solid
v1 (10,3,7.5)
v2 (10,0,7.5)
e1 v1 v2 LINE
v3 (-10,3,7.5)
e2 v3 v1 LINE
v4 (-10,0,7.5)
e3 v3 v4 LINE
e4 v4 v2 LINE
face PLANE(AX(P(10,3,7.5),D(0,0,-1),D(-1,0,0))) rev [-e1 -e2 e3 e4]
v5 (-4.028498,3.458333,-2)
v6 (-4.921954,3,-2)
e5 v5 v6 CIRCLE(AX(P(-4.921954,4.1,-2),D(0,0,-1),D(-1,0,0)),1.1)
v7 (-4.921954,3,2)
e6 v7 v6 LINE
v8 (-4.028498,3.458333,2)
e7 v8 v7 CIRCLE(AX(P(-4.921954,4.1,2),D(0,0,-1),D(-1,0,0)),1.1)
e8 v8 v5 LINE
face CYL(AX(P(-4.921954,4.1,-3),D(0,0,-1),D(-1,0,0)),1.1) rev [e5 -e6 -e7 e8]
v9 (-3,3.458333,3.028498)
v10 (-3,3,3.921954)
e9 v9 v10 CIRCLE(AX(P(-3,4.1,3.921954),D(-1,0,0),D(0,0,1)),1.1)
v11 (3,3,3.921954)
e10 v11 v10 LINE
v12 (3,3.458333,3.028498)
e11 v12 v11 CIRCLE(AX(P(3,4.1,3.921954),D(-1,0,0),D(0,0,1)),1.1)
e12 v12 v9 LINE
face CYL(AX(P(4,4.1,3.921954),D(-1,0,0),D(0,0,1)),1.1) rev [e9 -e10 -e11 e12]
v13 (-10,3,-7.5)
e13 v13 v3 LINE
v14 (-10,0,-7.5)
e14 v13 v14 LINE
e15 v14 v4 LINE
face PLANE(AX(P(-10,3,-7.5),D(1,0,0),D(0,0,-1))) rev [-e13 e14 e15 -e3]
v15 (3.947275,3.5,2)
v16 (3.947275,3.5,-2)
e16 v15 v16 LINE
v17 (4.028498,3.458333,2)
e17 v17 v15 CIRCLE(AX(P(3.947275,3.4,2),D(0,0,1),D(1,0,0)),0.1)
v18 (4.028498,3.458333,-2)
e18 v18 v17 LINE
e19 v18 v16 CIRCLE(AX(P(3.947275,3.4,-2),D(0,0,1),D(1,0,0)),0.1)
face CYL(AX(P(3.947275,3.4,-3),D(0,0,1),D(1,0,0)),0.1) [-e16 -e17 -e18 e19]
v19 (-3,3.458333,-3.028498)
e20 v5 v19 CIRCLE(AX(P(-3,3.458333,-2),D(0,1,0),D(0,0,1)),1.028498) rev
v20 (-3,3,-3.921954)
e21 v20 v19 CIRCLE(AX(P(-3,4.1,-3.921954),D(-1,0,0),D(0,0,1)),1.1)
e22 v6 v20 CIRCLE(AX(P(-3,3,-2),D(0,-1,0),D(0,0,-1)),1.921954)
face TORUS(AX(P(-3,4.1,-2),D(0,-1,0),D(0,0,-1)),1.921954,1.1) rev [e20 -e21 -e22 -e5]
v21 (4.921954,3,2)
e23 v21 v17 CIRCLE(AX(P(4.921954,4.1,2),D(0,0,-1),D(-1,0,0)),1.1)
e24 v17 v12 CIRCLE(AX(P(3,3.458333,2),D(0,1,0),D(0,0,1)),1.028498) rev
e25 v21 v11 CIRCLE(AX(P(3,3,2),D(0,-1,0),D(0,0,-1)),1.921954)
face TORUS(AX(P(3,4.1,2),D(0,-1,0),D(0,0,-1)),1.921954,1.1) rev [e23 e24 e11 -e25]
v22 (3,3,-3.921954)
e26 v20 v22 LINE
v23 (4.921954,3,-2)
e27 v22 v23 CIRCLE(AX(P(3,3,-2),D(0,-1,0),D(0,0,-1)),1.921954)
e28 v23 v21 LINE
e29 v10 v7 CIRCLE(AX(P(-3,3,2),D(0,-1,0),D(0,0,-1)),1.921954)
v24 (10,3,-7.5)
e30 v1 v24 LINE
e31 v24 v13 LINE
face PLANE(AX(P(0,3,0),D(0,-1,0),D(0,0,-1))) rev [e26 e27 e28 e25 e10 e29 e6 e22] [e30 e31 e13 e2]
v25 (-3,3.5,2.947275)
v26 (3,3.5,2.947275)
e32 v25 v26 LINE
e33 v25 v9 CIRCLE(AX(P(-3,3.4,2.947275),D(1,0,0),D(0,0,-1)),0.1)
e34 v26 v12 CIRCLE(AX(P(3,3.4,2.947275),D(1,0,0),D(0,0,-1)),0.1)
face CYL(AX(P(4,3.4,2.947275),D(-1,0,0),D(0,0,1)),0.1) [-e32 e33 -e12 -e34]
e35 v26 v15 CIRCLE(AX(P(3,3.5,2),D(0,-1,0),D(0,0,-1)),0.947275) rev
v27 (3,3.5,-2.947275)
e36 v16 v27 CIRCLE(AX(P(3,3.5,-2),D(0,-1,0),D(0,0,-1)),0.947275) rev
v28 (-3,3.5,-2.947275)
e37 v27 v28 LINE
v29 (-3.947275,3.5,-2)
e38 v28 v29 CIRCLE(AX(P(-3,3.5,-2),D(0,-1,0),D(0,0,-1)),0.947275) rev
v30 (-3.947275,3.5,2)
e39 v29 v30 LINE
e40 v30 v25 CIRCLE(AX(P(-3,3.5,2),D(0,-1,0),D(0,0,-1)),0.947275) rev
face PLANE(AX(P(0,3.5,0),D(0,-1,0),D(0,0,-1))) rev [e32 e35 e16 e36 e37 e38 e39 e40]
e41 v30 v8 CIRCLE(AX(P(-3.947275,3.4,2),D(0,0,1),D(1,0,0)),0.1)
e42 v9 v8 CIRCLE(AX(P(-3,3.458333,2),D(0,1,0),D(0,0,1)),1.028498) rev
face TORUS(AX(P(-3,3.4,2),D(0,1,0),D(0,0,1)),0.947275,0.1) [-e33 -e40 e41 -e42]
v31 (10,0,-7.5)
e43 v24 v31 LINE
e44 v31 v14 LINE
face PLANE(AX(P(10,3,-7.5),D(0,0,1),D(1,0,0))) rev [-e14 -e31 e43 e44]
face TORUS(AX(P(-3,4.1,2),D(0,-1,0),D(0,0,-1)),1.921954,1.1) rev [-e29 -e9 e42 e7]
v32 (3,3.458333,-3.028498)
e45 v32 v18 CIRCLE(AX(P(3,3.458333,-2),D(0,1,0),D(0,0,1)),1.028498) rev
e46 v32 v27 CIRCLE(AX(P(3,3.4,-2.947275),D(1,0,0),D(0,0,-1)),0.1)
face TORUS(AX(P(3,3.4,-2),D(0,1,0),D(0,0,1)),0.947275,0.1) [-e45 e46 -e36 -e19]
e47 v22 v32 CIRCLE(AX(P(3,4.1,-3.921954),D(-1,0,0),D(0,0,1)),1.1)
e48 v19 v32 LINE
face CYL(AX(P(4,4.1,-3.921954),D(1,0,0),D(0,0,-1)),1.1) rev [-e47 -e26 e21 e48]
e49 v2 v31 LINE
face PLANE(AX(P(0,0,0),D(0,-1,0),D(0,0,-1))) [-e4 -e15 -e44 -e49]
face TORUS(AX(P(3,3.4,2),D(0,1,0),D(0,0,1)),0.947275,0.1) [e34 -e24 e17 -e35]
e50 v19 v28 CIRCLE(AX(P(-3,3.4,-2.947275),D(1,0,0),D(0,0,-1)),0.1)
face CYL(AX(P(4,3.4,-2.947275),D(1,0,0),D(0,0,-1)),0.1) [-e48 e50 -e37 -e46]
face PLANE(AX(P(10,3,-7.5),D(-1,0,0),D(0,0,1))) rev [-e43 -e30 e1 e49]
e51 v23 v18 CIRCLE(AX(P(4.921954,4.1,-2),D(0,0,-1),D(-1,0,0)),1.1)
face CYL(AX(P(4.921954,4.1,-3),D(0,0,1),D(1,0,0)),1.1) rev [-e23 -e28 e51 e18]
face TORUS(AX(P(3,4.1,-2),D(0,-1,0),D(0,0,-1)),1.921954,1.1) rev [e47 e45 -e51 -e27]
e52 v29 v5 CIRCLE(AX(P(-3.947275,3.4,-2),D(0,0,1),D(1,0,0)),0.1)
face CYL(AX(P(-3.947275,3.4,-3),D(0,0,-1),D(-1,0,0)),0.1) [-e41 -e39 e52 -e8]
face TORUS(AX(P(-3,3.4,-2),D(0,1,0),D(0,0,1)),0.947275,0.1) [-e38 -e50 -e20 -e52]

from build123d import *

# Parameters (mm, degrees)
SKETCH_1_W      = 20
SKETCH_1_H      = 15
EXTRUDE_1_DEPTH = 3
SKETCH_2_W      = 8
SKETCH_2_H      = 6
EXTRUDE_2_DEPTH = 0.5
FILLET_1_R      = 1
FILLET_2_R      = 1.1
FILLET_3_R      = 0.1


with BuildPart() as part:
    # 草图1 → 凸台-拉伸1 (new body)
    with BuildSketch(Plane(origin=(0, 0, 0), x_dir=(1, 0, 0), z_dir=(0, 1, 0))):
        Rectangle(SKETCH_1_W, SKETCH_1_H)
    extrude(amount=EXTRUDE_1_DEPTH)

    # 草图2 → 凸台-拉伸2 (add)
    with BuildSketch(Plane(origin=(0, 3, 0), x_dir=(1, 0, 0), z_dir=(0, 1, 0))):
        Rectangle(SKETCH_2_W, SKETCH_2_H)
    extrude(amount=EXTRUDE_2_DEPTH)

    # 圆角1
    fillet_1_edges = [part.edges().sort_by_distance(p)[0] for p in [
        (-4, 3.25, -3),
        (-4, 3.25, 3),
        (4, 3.25, 3),
        (4, 3.25, -3),
    ]]
    fillet(fillet_1_edges, radius=FILLET_1_R)

    # 圆角2
    # the kernel refuses this fillet: 1.1 mm, written as the material it adds along each edge
    with BuildSketch(Plane(origin=(3, 3, 2), x_dir=(0, 0, 1), z_dir=(-1, 0, 0))) as fillet_2_piece_1:
        with BuildLine():
            CenterArc((1.921954446, 1.1), FILLET_2_R, 213.055731151, 56.944268849)
            Line((1, 0.5), (0.981560911, 0.488))
            ThreePointArc((0.981560911, 0.488), (0.978, 0.25), (0.978, 0))
            Line((0.978, 0), (1, -0.022))
            Line((1, -0.022), (1.921954446, -0.022))
            Line((1.921954446, -0.022), (1.921954446, 0))
        make_face()
    revolve(axis=Axis((3, 3, 2), (0, 1, 0)), revolution_arc=90)
    with BuildSketch(Plane(origin=(-3, 3, 3), x_dir=(0, 0, 1), z_dir=(1, 0, 0)), Plane(origin=(3, 3, -3), x_dir=(0, 0, -1), z_dir=(-1, 0, 0))) as fillet_2_piece_2:
        with BuildLine():
            CenterArc((0.921954446, -1.1), FILLET_2_R, 90, 56.944268849)
            Line((0, -0.5), (-0.018439089, -0.488))
            ThreePointArc((-0.018439089, -0.488), (-0.022, -0.25), (-0.022, 0))
            Line((-0.022, 0), (0, 0.022))
            Line((0, 0.022), (0.921954446, 0.022))
            Line((0.921954446, 0.022), (0.921954446, 0))
        make_face()
    extrude(amount=6)
    with BuildSketch(Plane(origin=(-3, 3, 2), x_dir=(-1, 0, 0), z_dir=(0, 0, -1))) as fillet_2_piece_3:
        with BuildLine():
            CenterArc((1.921954446, 1.1), FILLET_2_R, 213.055731151, 56.944268849)
            Line((1, 0.5), (0.981560911, 0.488))
            ThreePointArc((0.981560911, 0.488), (0.978, 0.25), (0.978, 0))
            Line((0.978, 0), (1, -0.022))
            Line((1, -0.022), (1.921954446, -0.022))
            Line((1.921954446, -0.022), (1.921954446, 0))
        make_face()
    revolve(axis=Axis((-3, 3, 2), (0, 1, 0)), revolution_arc=90)
    with BuildSketch(Plane(origin=(-4, 3, -2), x_dir=(-1, 0, 0), z_dir=(0, 0, 1)), Plane(origin=(4, 3, 2), x_dir=(1, 0, 0), z_dir=(0, 0, -1))) as fillet_2_piece_4:
        with BuildLine():
            CenterArc((0.921954446, -1.1), FILLET_2_R, 90, 56.944268849)
            Line((0, -0.5), (-0.018439089, -0.488))
            ThreePointArc((-0.018439089, -0.488), (-0.022, -0.25), (-0.022, 0))
            Line((-0.022, 0), (0, 0.022))
            Line((0, 0.022), (0.921954446, 0.022))
            Line((0.921954446, 0.022), (0.921954446, 0))
        make_face()
    extrude(amount=4)
    with BuildSketch(Plane(origin=(-3, 3, -2), x_dir=(0, 0, -1), z_dir=(1, 0, 0))) as fillet_2_piece_5:
        with BuildLine():
            CenterArc((1.921954446, 1.1), FILLET_2_R, 213.055731151, 56.944268849)
            Line((1, 0.5), (0.981560911, 0.488))
            ThreePointArc((0.981560911, 0.488), (0.978, 0.25), (0.978, 0))
            Line((0.978, 0), (1, -0.022))
            Line((1, -0.022), (1.921954446, -0.022))
            Line((1.921954446, -0.022), (1.921954446, 0))
        make_face()
    revolve(axis=Axis((-3, 3, -2), (0, 1, 0)), revolution_arc=90)
    with BuildSketch(Plane(origin=(3, 3, -2), x_dir=(0, 0, -1), z_dir=(-1, 0, 0))) as fillet_2_piece_6:
        with BuildLine():
            CenterArc((1.921954446, -1.1), FILLET_2_R, 90, 56.944268849)
            Line((1, -0.5), (0.981560911, -0.488))
            ThreePointArc((0.981560911, -0.488), (0.978, -0.25), (0.978, 0))
            Line((0.978, 0), (1, 0.022))
            Line((1, 0.022), (1.921954446, 0.022))
            Line((1.921954446, 0.022), (1.921954446, 0))
        make_face()
    revolve(axis=Axis((3, 3, -2), (0, -1, 0)), revolution_arc=90)

    # 圆角3
    fillet_3_edges = [part.edges().sort_by_distance(p)[0] for p in [
        (-4, 3.5, 0),
        (0, 3.5, -3),
        (0, 3.5, 3),
        (4, 3.5, 0),
        (-3.707106781, 3.5, 2.707106781),
        (3.707106781, 3.5, 2.707106781),
        (3.707106781, 3.5, -2.707106781),
        (-3.707106781, 3.5, -2.707106781),
    ]]
    fillet(fillet_3_edges, radius=FILLET_3_R)


solid = part.part
